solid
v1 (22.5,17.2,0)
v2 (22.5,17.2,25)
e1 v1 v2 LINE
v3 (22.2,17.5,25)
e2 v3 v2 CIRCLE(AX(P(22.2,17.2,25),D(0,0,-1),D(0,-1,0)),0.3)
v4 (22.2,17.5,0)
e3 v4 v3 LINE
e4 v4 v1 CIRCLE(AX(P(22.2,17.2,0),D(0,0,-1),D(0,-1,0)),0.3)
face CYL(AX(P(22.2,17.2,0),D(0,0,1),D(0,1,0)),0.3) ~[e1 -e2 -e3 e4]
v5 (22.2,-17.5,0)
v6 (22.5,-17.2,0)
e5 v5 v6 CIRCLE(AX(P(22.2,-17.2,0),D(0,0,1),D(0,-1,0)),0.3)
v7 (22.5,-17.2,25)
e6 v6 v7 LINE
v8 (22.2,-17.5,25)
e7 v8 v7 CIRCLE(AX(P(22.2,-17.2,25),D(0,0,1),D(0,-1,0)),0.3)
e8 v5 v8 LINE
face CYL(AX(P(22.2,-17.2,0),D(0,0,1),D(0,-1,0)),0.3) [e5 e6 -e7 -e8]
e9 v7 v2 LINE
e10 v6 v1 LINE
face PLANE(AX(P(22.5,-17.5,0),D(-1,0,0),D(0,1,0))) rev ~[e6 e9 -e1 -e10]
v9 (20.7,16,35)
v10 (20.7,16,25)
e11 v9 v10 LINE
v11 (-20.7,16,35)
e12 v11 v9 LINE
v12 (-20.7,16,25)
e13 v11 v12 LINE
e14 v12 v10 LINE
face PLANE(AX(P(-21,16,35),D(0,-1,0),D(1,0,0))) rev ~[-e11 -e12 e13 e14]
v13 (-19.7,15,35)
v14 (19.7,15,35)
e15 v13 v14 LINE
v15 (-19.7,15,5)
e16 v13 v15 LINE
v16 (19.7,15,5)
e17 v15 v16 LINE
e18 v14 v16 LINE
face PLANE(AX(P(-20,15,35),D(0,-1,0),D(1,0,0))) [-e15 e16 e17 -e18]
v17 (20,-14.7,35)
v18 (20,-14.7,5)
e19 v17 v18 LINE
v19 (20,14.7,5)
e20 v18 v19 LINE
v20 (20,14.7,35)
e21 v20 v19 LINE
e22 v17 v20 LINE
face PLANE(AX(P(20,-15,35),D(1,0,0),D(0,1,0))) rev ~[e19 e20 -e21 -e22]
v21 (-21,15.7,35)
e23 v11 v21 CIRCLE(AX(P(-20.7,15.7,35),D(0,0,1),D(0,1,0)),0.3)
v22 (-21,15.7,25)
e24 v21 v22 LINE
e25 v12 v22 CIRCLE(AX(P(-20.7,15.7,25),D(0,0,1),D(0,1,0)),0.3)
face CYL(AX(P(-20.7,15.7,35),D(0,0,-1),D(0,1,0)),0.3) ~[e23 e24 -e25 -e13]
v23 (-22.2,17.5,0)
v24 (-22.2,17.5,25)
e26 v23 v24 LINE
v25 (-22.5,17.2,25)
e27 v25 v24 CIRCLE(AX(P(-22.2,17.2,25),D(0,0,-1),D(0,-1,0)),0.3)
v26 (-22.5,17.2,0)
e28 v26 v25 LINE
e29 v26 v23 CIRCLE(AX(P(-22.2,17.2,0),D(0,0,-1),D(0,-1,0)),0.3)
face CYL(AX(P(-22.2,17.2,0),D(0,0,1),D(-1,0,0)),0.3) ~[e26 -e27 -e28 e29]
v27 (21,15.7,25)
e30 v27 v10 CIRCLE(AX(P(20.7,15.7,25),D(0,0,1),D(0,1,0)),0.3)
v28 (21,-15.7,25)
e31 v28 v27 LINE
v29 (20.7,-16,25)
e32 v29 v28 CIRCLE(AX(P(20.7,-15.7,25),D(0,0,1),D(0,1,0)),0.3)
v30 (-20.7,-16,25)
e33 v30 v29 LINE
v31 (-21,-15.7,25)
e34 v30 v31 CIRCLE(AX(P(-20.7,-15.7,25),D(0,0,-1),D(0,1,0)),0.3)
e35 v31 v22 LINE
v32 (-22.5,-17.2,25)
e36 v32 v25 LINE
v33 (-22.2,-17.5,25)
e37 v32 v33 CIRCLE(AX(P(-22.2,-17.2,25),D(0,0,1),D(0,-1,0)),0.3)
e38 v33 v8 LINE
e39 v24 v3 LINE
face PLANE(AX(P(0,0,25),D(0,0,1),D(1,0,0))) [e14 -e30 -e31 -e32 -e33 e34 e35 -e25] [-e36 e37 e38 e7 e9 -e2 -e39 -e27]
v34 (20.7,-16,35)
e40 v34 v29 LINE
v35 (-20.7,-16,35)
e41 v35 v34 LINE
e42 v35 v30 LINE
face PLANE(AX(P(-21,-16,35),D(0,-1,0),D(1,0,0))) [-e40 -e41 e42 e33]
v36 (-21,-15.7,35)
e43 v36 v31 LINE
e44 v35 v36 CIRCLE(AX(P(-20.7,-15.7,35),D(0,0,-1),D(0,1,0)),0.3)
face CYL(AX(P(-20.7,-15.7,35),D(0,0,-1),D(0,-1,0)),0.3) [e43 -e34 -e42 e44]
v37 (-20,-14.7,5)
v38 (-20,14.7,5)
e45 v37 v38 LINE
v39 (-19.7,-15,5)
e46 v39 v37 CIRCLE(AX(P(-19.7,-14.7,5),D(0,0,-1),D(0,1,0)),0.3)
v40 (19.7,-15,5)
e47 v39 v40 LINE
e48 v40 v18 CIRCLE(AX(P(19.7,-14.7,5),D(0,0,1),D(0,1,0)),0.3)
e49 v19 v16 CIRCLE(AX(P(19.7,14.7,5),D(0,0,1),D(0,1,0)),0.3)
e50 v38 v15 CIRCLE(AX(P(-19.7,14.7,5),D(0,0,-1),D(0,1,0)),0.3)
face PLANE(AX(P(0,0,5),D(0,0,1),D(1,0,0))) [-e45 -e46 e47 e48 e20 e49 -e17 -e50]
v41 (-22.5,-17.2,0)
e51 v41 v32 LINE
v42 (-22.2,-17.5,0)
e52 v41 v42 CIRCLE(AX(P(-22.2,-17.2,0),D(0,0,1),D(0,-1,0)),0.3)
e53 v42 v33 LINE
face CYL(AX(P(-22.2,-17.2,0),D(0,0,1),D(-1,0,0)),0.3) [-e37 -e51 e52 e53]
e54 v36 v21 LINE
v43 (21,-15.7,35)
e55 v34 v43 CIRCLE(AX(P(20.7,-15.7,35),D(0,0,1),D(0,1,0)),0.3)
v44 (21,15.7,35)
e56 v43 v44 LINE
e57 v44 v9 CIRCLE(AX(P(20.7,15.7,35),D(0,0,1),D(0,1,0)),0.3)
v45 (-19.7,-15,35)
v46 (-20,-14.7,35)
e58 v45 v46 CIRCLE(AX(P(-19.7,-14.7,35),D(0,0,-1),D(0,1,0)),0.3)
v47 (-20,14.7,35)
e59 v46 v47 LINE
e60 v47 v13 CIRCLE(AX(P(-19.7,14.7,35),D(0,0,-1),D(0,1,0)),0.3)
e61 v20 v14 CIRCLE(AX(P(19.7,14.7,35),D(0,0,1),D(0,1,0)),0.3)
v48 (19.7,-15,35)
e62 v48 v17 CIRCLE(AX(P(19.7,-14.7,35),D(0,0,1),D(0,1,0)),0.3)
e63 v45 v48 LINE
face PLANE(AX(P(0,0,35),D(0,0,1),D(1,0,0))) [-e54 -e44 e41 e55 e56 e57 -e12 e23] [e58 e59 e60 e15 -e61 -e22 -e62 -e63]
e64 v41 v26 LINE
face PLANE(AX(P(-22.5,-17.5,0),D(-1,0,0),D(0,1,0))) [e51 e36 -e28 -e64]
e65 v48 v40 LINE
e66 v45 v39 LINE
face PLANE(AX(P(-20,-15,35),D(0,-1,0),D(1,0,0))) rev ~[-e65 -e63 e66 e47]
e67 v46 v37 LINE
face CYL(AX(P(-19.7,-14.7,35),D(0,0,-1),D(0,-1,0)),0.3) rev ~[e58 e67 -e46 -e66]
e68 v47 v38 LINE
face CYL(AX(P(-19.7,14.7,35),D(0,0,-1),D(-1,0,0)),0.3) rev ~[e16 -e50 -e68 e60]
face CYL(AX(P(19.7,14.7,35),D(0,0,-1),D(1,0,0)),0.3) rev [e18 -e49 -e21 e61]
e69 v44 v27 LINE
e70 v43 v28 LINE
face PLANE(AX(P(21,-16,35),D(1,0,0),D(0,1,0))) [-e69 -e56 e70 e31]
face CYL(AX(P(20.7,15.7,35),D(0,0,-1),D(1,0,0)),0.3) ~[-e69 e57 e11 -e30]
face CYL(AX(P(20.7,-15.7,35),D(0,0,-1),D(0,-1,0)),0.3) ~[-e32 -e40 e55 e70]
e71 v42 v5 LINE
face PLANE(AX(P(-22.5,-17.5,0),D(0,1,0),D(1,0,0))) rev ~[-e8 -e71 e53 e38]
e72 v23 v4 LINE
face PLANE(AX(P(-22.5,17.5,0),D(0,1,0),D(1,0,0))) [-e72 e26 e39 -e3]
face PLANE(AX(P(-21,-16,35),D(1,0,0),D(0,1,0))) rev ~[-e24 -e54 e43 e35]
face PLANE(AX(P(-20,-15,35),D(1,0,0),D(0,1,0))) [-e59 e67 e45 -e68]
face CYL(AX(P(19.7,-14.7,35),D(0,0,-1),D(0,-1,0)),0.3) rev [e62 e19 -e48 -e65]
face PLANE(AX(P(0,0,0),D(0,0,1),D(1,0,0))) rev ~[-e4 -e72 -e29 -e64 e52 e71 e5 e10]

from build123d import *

# Parameters (mm, degrees)
F0_W     = 45
F0_H     = 35
F1_DEPTH = 35
F2_W     = 40
F2_H     = 30
F3_DEPTH = 30
F4_W     = 45
F4_H     = 35
F4_W_2   = 42
F4_H_2   = 32
F5_DEPTH = 10
F6_R     = 0.3


with BuildPart() as f1:
    # F0 (on Top) → F1 (new body)
    with BuildSketch(Plane.XY):
        Rectangle(F0_W, F0_H)
    extrude(amount=F1_DEPTH)

    # F2 (on face) → F3 (cut)
    with BuildSketch(Plane.XY.offset(35)):
        Rectangle(F2_W, F2_H)
    extrude(amount=-F3_DEPTH, mode=Mode.SUBTRACT)

    # F4 (on face) → F5 (cut)
    with BuildSketch(Plane.XY.offset(35)):
        Rectangle(F4_W, F4_H)
        Rectangle(F4_W_2, F4_H_2, mode=Mode.SUBTRACT)
    extrude(amount=-F5_DEPTH, mode=Mode.SUBTRACT)

    # F6
    f6_edges = [f1.edges().sort_by_distance(p)[0] for p in [
        (-22.5, 17.5, 12.5),
        (22.5, 17.5, 12.5),
        (22.5, -17.5, 12.5),
        (-22.5, -17.5, 12.5),
        (-21, -16, 30),
        (21, -16, 30),
        (21, 16, 30),
        (-21, 16, 30),
        (-20, 15, 20),
        (20, 15, 20),
        (20, -15, 20),
        (-20, -15, 20),
    ]]
    fillet(f6_edges, radius=F6_R)


solid = f1.part
